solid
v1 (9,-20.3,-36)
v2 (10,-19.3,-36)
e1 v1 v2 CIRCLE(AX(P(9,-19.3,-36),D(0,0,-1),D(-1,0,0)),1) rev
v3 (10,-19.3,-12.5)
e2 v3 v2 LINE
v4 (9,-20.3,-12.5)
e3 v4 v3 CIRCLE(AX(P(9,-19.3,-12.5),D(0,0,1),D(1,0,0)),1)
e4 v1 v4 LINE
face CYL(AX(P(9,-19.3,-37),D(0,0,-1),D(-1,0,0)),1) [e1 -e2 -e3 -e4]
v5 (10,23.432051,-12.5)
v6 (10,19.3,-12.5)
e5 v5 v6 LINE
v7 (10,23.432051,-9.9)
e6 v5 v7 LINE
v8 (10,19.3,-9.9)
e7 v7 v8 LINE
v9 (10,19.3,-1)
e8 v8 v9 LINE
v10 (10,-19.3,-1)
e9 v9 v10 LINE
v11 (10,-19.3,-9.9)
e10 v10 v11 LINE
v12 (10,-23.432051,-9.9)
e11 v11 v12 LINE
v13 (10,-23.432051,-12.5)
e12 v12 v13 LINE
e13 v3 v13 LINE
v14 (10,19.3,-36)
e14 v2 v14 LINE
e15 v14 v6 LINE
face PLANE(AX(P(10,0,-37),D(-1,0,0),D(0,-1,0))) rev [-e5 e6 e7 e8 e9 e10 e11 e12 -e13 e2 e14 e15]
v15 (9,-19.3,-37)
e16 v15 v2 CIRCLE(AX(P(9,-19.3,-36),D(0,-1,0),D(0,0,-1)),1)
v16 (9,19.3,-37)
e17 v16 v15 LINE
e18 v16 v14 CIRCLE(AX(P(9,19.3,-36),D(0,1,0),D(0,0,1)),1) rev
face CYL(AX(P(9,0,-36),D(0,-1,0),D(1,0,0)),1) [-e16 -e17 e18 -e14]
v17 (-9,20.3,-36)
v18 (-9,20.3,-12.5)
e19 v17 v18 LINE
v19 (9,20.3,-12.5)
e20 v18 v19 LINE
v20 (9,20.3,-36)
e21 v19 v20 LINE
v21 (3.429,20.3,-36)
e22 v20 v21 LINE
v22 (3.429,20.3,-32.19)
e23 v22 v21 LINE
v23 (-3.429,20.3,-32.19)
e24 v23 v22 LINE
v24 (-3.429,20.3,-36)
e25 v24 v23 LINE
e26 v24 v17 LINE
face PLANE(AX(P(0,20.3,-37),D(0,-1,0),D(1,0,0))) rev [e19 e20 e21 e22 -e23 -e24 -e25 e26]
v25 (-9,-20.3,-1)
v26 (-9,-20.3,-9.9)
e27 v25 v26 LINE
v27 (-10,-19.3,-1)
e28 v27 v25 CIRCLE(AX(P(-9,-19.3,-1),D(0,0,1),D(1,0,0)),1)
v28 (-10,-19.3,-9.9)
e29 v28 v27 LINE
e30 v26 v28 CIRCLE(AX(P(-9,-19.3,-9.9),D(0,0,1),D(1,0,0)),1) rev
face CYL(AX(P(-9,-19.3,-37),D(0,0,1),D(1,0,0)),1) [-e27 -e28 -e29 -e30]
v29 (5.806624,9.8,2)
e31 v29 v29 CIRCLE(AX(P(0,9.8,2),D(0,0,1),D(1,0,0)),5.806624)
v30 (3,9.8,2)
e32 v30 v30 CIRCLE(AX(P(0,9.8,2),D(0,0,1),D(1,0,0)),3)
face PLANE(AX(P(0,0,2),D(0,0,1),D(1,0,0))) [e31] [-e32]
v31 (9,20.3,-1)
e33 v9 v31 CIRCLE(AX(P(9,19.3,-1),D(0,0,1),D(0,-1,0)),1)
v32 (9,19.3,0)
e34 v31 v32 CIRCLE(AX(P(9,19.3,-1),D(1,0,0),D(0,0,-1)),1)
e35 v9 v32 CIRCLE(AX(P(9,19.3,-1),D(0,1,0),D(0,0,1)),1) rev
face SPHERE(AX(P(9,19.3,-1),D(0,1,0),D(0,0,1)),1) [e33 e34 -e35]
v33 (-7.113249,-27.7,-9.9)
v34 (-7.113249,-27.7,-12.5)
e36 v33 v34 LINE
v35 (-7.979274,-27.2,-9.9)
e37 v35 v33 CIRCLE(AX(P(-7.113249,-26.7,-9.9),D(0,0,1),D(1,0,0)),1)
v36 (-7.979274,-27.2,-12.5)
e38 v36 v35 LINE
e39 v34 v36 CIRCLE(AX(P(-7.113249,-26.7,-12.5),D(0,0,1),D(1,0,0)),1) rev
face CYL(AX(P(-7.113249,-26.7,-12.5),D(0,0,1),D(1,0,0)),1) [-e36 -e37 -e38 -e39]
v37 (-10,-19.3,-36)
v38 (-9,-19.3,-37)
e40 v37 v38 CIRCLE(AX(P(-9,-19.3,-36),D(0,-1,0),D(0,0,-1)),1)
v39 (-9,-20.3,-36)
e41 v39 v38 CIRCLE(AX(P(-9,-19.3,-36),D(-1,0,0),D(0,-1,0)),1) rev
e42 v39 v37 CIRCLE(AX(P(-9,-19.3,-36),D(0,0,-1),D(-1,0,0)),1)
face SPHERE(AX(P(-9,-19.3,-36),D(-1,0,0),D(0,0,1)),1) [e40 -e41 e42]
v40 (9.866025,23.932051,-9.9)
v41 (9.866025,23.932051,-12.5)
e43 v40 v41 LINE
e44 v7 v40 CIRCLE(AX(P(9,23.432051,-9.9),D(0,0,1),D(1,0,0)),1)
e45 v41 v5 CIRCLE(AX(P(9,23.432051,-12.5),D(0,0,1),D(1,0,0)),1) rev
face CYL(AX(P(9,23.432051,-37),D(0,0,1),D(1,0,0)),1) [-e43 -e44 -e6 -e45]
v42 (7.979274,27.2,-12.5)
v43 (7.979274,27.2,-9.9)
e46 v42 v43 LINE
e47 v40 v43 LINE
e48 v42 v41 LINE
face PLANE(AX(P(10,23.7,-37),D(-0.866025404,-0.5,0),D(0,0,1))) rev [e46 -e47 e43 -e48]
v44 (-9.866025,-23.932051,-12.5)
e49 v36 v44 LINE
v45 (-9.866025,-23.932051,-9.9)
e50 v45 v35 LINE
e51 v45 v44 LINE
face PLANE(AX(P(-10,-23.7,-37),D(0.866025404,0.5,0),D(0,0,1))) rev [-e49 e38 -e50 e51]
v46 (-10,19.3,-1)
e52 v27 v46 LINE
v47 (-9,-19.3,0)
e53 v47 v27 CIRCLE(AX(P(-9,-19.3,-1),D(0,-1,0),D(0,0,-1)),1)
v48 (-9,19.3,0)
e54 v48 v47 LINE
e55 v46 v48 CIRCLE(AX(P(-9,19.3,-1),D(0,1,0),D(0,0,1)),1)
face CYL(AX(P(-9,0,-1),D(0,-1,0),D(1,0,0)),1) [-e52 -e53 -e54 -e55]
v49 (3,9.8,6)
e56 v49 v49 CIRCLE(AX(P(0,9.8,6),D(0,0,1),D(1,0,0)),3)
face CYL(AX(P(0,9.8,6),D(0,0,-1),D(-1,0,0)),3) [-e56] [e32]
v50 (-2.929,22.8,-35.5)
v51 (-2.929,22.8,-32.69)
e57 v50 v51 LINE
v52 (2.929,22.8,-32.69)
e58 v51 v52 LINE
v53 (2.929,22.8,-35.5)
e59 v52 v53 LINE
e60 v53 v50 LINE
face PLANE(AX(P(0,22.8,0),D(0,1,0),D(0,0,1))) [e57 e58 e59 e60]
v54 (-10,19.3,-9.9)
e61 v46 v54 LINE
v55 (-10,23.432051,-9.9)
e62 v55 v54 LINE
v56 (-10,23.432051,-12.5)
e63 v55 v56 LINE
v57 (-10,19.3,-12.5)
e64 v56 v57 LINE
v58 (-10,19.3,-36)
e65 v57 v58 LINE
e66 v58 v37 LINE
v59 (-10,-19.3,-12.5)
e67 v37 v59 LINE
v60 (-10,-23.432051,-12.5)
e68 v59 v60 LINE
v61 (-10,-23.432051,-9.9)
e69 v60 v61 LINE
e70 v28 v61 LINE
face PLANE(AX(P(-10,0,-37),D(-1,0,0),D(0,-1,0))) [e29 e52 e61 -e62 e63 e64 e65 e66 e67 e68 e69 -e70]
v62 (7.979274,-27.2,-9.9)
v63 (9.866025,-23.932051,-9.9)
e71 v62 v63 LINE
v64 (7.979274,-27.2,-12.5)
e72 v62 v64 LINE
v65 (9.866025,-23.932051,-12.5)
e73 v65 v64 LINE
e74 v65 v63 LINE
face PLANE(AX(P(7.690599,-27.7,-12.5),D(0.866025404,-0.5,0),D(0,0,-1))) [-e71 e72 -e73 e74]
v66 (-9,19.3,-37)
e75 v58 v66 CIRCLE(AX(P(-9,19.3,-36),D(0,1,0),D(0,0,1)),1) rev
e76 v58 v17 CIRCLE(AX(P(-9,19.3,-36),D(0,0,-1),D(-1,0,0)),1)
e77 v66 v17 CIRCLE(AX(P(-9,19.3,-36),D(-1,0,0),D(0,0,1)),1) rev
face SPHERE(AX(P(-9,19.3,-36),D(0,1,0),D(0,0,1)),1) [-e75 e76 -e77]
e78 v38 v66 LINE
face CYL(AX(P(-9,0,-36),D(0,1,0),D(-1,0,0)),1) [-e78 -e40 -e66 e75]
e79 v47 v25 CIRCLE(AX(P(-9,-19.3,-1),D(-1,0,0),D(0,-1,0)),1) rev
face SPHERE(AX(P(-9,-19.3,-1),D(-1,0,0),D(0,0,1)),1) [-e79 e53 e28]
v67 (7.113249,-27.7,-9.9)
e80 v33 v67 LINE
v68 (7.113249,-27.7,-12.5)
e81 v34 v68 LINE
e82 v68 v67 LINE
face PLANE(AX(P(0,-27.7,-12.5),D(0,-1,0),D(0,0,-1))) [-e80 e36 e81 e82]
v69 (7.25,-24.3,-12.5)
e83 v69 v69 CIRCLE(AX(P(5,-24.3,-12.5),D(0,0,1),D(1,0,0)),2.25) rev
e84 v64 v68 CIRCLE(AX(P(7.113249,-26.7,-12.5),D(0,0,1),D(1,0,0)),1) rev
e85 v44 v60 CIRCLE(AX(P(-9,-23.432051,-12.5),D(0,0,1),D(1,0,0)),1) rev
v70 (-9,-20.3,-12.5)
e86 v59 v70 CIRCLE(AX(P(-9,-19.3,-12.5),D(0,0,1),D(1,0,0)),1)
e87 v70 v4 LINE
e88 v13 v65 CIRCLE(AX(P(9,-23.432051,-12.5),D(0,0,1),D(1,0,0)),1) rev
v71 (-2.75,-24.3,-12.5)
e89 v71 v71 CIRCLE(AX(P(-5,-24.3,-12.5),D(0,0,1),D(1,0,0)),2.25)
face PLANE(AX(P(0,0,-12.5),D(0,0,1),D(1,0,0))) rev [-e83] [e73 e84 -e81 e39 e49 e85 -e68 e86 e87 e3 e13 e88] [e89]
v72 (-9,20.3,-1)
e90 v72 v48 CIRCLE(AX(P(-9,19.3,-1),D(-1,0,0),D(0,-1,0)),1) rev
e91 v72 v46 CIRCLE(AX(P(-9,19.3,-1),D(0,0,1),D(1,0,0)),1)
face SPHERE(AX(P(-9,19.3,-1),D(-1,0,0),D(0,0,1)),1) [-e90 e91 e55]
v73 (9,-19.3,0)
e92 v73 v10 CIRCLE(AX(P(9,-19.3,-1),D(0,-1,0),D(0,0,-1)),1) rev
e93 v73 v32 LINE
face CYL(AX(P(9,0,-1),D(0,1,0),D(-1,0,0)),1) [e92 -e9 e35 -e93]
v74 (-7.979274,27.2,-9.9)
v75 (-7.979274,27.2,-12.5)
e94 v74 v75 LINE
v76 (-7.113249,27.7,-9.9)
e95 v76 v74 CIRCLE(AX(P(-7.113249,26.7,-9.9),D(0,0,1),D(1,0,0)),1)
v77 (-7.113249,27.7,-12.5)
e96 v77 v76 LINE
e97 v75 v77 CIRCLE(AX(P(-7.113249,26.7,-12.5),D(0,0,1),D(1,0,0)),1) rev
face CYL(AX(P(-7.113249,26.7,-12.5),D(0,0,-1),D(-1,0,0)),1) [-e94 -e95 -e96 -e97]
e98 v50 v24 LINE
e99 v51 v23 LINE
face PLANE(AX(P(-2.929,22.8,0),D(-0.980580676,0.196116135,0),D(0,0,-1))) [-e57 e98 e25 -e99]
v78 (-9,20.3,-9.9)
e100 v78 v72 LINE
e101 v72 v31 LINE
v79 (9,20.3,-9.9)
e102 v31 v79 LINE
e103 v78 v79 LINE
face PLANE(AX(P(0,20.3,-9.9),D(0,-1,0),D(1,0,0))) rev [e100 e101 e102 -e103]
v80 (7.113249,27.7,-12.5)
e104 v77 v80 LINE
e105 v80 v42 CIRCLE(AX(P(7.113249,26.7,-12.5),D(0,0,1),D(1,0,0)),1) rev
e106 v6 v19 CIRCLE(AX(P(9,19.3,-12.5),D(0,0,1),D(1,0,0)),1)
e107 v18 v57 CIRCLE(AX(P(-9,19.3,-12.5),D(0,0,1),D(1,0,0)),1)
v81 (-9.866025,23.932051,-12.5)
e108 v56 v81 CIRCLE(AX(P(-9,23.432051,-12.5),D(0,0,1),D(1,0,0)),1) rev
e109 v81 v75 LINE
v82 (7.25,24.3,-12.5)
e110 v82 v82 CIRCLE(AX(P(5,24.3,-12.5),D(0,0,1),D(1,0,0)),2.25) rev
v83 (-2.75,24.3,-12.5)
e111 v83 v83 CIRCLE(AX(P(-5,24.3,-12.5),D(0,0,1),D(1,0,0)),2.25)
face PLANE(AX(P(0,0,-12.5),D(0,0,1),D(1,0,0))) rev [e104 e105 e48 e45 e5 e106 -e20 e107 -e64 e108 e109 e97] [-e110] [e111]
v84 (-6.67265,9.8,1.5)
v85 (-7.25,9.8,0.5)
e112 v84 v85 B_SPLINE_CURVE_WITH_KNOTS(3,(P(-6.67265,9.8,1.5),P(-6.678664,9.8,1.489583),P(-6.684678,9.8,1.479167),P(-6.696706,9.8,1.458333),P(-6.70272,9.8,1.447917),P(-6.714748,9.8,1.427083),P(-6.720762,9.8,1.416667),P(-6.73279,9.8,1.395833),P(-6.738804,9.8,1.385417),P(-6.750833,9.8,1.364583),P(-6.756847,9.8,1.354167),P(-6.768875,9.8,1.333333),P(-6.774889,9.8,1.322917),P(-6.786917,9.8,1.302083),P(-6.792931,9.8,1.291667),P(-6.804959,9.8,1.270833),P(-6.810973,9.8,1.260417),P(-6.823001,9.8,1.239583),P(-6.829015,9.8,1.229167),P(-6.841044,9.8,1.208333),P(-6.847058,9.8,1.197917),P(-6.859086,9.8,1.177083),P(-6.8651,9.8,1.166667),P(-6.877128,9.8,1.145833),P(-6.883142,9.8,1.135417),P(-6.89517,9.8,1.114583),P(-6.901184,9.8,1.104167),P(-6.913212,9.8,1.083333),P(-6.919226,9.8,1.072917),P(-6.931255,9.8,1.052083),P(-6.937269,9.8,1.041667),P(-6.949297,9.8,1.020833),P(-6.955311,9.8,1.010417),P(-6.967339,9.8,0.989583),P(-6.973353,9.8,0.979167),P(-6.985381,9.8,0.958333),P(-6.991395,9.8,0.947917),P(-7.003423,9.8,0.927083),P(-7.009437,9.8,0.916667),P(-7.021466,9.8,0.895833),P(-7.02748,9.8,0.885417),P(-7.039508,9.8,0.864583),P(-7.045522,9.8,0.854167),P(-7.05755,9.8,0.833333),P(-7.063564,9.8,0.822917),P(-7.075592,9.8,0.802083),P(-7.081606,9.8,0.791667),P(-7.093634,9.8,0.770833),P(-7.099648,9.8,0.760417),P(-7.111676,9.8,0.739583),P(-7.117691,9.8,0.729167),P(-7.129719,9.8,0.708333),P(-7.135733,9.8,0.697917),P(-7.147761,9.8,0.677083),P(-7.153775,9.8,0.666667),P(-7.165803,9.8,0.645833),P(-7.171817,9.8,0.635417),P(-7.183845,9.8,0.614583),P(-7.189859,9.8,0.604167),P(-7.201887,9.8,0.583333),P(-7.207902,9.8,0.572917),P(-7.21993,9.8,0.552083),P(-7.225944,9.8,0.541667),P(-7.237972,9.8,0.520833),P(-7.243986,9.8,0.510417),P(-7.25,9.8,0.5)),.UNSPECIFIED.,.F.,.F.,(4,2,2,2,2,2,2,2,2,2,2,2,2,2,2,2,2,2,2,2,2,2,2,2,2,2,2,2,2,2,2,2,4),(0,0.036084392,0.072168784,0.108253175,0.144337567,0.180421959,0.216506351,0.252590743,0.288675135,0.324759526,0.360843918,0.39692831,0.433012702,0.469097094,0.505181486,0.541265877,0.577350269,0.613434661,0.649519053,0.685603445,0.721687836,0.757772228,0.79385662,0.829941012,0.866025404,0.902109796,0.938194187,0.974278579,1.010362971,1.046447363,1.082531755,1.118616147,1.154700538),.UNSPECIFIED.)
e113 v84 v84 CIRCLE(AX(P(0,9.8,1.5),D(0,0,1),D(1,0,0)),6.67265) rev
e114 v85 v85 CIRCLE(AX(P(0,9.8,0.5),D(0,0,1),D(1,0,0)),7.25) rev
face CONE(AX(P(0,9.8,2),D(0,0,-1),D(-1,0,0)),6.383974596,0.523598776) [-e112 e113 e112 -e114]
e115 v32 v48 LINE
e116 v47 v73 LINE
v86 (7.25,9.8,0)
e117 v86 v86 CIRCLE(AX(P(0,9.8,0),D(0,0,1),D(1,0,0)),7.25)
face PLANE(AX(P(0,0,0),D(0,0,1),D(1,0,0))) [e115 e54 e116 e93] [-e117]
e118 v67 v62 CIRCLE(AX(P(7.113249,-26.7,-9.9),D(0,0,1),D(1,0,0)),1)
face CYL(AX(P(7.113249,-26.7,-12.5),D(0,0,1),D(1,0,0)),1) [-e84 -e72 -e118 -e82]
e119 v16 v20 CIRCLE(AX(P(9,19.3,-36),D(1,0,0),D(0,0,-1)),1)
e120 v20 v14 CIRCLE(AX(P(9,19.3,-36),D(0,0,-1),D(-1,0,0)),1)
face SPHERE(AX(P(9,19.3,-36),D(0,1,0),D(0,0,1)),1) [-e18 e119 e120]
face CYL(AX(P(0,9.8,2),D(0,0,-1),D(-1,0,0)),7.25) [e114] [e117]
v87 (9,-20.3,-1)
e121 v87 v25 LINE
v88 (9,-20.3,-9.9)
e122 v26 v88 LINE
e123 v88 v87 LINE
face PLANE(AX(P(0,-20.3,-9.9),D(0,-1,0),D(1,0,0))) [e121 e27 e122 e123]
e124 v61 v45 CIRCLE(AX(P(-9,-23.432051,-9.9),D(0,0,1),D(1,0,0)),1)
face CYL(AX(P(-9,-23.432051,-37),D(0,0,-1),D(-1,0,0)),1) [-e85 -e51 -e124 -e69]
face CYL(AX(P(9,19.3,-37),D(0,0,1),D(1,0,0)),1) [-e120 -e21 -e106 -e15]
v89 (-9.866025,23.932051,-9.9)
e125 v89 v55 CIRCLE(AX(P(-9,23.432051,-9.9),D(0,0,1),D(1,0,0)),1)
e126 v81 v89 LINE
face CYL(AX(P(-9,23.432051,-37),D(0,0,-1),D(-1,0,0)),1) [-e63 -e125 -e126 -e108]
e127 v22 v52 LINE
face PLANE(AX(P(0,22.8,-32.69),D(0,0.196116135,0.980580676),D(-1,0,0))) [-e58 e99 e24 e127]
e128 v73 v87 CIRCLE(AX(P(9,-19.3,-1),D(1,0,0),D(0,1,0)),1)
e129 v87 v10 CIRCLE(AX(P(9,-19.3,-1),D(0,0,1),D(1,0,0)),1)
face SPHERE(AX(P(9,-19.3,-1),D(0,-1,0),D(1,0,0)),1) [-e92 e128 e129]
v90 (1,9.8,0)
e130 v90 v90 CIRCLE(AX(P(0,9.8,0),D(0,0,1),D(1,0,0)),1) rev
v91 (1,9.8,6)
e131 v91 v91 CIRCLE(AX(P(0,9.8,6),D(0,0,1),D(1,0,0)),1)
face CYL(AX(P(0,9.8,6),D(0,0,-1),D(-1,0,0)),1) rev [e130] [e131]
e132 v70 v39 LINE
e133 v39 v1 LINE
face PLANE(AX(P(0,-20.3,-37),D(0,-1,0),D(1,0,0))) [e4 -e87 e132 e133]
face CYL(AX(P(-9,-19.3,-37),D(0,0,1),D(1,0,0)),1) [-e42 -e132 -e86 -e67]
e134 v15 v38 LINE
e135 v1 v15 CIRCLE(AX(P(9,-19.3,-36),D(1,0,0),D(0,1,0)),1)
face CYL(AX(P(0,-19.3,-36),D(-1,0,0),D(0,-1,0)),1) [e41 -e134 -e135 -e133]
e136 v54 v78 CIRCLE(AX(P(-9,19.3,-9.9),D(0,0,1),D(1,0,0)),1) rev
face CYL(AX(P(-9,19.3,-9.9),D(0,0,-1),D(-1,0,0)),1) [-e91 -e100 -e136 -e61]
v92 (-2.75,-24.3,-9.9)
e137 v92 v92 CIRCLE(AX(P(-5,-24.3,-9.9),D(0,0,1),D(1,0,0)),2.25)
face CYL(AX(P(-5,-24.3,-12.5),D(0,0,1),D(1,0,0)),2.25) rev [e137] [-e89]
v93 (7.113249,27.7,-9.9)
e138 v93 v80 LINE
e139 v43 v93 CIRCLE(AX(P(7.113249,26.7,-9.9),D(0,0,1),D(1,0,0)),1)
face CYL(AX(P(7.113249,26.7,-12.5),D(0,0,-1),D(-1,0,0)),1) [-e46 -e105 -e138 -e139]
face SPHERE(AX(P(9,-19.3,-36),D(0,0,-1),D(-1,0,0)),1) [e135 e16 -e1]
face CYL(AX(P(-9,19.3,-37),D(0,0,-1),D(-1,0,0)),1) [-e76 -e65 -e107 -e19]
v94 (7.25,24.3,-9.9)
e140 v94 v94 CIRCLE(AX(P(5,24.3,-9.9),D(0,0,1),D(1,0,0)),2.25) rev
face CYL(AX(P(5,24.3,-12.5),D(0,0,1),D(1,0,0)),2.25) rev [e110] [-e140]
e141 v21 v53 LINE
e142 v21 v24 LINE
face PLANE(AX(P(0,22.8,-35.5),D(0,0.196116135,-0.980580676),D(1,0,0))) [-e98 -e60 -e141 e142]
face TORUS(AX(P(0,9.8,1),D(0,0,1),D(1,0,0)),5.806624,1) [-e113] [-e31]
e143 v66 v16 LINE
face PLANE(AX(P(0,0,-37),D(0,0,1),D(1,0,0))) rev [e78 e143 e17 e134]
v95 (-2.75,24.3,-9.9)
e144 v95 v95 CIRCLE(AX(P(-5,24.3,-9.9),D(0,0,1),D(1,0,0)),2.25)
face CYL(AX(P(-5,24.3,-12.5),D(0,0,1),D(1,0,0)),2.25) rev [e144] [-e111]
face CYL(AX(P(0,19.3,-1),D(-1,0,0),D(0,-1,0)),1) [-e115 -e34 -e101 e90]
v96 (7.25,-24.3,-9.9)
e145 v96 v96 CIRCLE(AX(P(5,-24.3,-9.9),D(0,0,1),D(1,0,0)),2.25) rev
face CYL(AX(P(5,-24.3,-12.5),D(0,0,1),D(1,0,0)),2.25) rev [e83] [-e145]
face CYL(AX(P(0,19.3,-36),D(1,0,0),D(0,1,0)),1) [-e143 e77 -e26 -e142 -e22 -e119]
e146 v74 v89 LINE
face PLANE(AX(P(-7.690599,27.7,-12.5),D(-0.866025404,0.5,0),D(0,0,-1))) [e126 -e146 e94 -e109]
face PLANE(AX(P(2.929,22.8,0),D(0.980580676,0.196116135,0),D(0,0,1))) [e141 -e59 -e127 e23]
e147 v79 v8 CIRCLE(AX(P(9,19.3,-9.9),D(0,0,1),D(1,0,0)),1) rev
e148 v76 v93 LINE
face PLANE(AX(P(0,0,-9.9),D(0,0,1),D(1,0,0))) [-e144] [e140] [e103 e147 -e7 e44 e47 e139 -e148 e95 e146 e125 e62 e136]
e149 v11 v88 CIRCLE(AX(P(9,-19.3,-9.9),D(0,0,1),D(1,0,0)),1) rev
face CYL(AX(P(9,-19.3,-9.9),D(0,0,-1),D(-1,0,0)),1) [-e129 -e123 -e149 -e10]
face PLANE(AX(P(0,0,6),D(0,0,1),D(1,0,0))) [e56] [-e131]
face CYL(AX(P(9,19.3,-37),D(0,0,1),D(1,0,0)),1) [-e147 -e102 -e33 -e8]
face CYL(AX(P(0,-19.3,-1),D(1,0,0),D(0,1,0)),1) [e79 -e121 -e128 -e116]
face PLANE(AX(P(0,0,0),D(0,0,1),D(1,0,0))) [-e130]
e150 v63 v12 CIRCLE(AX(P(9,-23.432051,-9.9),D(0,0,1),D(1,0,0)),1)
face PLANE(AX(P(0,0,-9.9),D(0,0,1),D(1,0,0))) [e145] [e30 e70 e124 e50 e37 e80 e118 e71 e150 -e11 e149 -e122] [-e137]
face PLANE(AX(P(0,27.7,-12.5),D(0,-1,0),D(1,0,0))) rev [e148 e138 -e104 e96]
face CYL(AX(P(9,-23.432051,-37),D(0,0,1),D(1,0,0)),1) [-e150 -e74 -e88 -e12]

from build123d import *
from OCP.BRepFilletAPI import BRepFilletAPI_MakeChamfer

# Parameters (mm, degrees)
SKETCH3_W           = 20
SKETCH3_H           = 40.6
BOSS_EXTRUDE1_DEPTH = 37
SKETCH3_3_W         = 20
SKETCH3_3_H         = 7.4
SKETCH3_3_R         = 2.25
BOSS_EXTRUDE2_DEPTH = 12.5
SKETCH3_4_W         = 20
SKETCH3_4_H         = 7.4
SKETCH3_4_R         = 2.25
CUT_EXTRUDE1_DEPTH  = 9.9
SKETCH3_5_R         = 3
SKETCH3_5_R_2       = 1
BOSS_EXTRUDE3_DEPTH = 6
SKETCH3_6_R         = 7.25
SKETCH3_6_R_2       = 3
BOSS_EXTRUDE4_DEPTH = 2
CHAMFER1_SIZE       = 4
CHAMFER1_SIZE2      = 2.309401077
CHAMFER3_SIZE       = 1.5
CHAMFER3_SIZE2      = 0.866025404
FILLET2_R           = 1
SKETCH4_W           = 6.858
SKETCH4_H           = 3.81
BOSS_EXTRUDE6_DEPTH = 2.5
CHAMFER4_SIZE       = 2.5
CHAMFER4_SIZE_2     = 0.5


with BuildPart() as part:
    # Sketch3 → Boss-Extrude1 (new body)
    with BuildSketch(Plane.XY):
        Rectangle(SKETCH3_W, SKETCH3_H)
    extrude(amount=-BOSS_EXTRUDE1_DEPTH)

    # Sketch3<3> → Boss-Extrude2 (add)
    # profile 1 of 2: a face of its own
    with BuildSketch(Plane.XY):
        with Locations((0, 24)):
            Rectangle(SKETCH3_3_W, SKETCH3_3_H)
        with Locations((-5, 24.3)):
            Circle(SKETCH3_3_R, mode=Mode.SUBTRACT)
        with Locations((5, 24.3)):
            Circle(SKETCH3_3_R, mode=Mode.SUBTRACT)
    # profile 2 of 2: a face of its own
    with BuildSketch(Plane.XY):
        Polygon((10, -20.3), (-10, -20.3), (-10, -27.7), (0, -27.7), (10, -27.7), align=None)
        with Locations((-5, -24.3)):
            Circle(SKETCH3_3_R, mode=Mode.SUBTRACT)
        with Locations((5, -24.3)):
            Circle(SKETCH3_3_R, mode=Mode.SUBTRACT)
    extrude(amount=-BOSS_EXTRUDE2_DEPTH)

    # Sketch3<4> → Cut-Extrude1 (cut)
    # profile 1 of 2: a face of its own
    with BuildSketch(Plane.XY):
        with Locations((0, 24)):
            Rectangle(SKETCH3_4_W, SKETCH3_4_H)
        with Locations((-5, 24.3)):
            Circle(SKETCH3_4_R, mode=Mode.SUBTRACT)
        with Locations((5, 24.3)):
            Circle(SKETCH3_4_R, mode=Mode.SUBTRACT)
    # profile 2 of 2: a face of its own
    with BuildSketch(Plane.XY):
        Polygon((10, -20.3), (-10, -20.3), (-10, -27.7), (0, -27.7), (10, -27.7), align=None)
        with Locations((-5, -24.3)):
            Circle(SKETCH3_4_R, mode=Mode.SUBTRACT)
        with Locations((5, -24.3)):
            Circle(SKETCH3_4_R, mode=Mode.SUBTRACT)
    extrude(amount=-CUT_EXTRUDE1_DEPTH, mode=Mode.SUBTRACT)

    # Sketch3<5> → Boss-Extrude3 (add)
    with BuildSketch(Plane.XY):
        with Locations((0, 9.8)):
            Circle(SKETCH3_5_R)
        with Locations((0, 9.8)):
            Circle(SKETCH3_5_R_2, mode=Mode.SUBTRACT)
    extrude(amount=BOSS_EXTRUDE3_DEPTH)

    # Sketch3<6> → Boss-Extrude4 (add)
    with BuildSketch(Plane.XY):
        with Locations((0, 9.8)):
            Circle(SKETCH3_6_R)
        with Locations((0, 9.8)):
            Circle(SKETCH3_6_R_2, mode=Mode.SUBTRACT)
    extrude(amount=BOSS_EXTRUDE4_DEPTH)

    # Chamfer1: one chamfer whose edges measure the first distance from different faces: ONE call of the kernel's chamfer builder (chamfer() names one face for all edges)
    chamfer1_edges_1 = [part.edges().sort_by_distance(p)[0] for p in [
        (10, 27.7, -11.2),
        (10, -27.7, -11.2),
    ]]
    chamfer1_side_1 = [part.faces().sort_by_distance(p)[0] for p in [
        (10, 0, -18.317675312),
    ]]
    chamfer1_edges_2 = [part.edges().sort_by_distance(p)[0] for p in [
        (-10, 27.7, -11.2),
        (-10, -27.7, -11.2),
    ]]
    chamfer1_side_2 = [part.faces().sort_by_distance(p)[0] for p in [
        (-10, 0, -18.317675312),
    ]]
    chamfer1 = BRepFilletAPI_MakeChamfer(part.part.solid().wrapped)
    for e in chamfer1_edges_1:
        chamfer1.Add(CHAMFER1_SIZE, CHAMFER1_SIZE2, e.wrapped, chamfer1_side_1[0].wrapped)  # the first distance lies on this face
    for e in chamfer1_edges_2:
        chamfer1.Add(CHAMFER1_SIZE, CHAMFER1_SIZE2, e.wrapped, chamfer1_side_2[0].wrapped)  # the first distance lies on this face
    add(Compound.cast(chamfer1.Shape()), mode=Mode.REPLACE)

    # Chamfer3
    chamfer3_edges = [part.edges().sort_by_distance(p)[0] for p in [
        (-7.25, 9.8, 2),
    ]]
    chamfer3_side = [part.faces().sort_by_distance(p)[0] for p in [
        (-7.25, 9.8, 1),
    ]]
    chamfer(chamfer3_edges, length=CHAMFER3_SIZE, length2=CHAMFER3_SIZE2, reference=chamfer3_side[0])

    # Fillet2
    fillet2_edges = [part.edges().sort_by_distance(p)[0] for p in [
        (10, -20.3, -24.75),
        (-10, -20.3, -24.75),
        (-10, 20.3, -24.75),
        (10, 20.3, -24.75),
        (-7.690598923, -27.7, -11.2),
        (7.690598923, -27.7, -11.2),
        (0, 20.3, -37),
        (10, 23.7, -11.2),
        (10, -23.7, -11.2),
        (-10, 23.7, -11.2),
        (-10, -23.7, -11.2),
        (-7.690598923, 27.7, -11.2),
        (7.690598923, 27.7, -11.2),
        (-6.383974596, 9.8, 2),
        (-10, 0, -37),
        (0, -20.3, -37),
        (10, 0, -37),
        (10, 0, 0),
        (-10, 0, 0),
        (10, 20.3, -4.95),
        (-10, 20.3, -4.95),
        (0, 20.3, 0),
        (10, -20.3, -4.95),
        (0, -20.3, 0),
        (-10, -20.3, -4.95),
    ]]
    fillet(fillet2_edges, radius=FILLET2_R)

    # Sketch4 → Boss-Extrude6 (add)
    with BuildSketch(Plane(origin=(0, 20.3, 0), x_dir=(1, 0, 0), z_dir=(0, 1, 0))):
        with Locations((0, 34.095)):
            Rectangle(SKETCH4_W, SKETCH4_H)
    extrude(amount=BOSS_EXTRUDE6_DEPTH)

    # Chamfer4
    chamfer4_edges_1 = [part.edges().sort_by_distance(p)[0] for p in [
        (0, 22.8, -32.19),
    ]]
    chamfer4_side_1 = [part.faces().sort_by_distance(p)[0] for p in [
        (0, 22.79, -32.19),
    ]]
    chamfer4_edges_2 = [part.edges().sort_by_distance(p)[0] for p in [
        (-3.429, 22.8, -34.095),
    ]]
    chamfer4_side_2 = [part.faces().sort_by_distance(p)[0] for p in [
        (-3.429, 22.79, -34.095),
    ]]
    chamfer4_edges_3 = [part.edges().sort_by_distance(p)[0] for p in [
        (0, 22.8, -36),
    ]]
    chamfer4_side_3 = [part.faces().sort_by_distance(p)[0] for p in [
        (0, 22.79, -36),
    ]]
    chamfer4_edges_4 = [part.edges().sort_by_distance(p)[0] for p in [
        (3.429, 22.8, -34.095),
    ]]
    chamfer4_side_4 = [part.faces().sort_by_distance(p)[0] for p in [
        (3.429, 22.79, -34.095),
    ]]
    chamfer4 = BRepFilletAPI_MakeChamfer(part.part.solid().wrapped)
    for e in chamfer4_edges_1:
        chamfer4.Add(CHAMFER4_SIZE - 0.0001, CHAMFER4_SIZE_2 - 0.0001, e.wrapped, chamfer4_side_1[0].wrapped)
    for e in chamfer4_edges_2:
        chamfer4.Add(CHAMFER4_SIZE - 0.0001, CHAMFER4_SIZE_2 - 0.0001, e.wrapped, chamfer4_side_2[0].wrapped)
    for e in chamfer4_edges_3:
        chamfer4.Add(CHAMFER4_SIZE - 0.0001, CHAMFER4_SIZE_2 - 0.0001, e.wrapped, chamfer4_side_3[0].wrapped)
    for e in chamfer4_edges_4:
        chamfer4.Add(CHAMFER4_SIZE - 0.0001, CHAMFER4_SIZE_2 - 0.0001, e.wrapped, chamfer4_side_4[0].wrapped)
    add(Compound.cast(chamfer4.Shape()), mode=Mode.REPLACE)  # a hair under: the kernel refuses the full size


solid = part.part
